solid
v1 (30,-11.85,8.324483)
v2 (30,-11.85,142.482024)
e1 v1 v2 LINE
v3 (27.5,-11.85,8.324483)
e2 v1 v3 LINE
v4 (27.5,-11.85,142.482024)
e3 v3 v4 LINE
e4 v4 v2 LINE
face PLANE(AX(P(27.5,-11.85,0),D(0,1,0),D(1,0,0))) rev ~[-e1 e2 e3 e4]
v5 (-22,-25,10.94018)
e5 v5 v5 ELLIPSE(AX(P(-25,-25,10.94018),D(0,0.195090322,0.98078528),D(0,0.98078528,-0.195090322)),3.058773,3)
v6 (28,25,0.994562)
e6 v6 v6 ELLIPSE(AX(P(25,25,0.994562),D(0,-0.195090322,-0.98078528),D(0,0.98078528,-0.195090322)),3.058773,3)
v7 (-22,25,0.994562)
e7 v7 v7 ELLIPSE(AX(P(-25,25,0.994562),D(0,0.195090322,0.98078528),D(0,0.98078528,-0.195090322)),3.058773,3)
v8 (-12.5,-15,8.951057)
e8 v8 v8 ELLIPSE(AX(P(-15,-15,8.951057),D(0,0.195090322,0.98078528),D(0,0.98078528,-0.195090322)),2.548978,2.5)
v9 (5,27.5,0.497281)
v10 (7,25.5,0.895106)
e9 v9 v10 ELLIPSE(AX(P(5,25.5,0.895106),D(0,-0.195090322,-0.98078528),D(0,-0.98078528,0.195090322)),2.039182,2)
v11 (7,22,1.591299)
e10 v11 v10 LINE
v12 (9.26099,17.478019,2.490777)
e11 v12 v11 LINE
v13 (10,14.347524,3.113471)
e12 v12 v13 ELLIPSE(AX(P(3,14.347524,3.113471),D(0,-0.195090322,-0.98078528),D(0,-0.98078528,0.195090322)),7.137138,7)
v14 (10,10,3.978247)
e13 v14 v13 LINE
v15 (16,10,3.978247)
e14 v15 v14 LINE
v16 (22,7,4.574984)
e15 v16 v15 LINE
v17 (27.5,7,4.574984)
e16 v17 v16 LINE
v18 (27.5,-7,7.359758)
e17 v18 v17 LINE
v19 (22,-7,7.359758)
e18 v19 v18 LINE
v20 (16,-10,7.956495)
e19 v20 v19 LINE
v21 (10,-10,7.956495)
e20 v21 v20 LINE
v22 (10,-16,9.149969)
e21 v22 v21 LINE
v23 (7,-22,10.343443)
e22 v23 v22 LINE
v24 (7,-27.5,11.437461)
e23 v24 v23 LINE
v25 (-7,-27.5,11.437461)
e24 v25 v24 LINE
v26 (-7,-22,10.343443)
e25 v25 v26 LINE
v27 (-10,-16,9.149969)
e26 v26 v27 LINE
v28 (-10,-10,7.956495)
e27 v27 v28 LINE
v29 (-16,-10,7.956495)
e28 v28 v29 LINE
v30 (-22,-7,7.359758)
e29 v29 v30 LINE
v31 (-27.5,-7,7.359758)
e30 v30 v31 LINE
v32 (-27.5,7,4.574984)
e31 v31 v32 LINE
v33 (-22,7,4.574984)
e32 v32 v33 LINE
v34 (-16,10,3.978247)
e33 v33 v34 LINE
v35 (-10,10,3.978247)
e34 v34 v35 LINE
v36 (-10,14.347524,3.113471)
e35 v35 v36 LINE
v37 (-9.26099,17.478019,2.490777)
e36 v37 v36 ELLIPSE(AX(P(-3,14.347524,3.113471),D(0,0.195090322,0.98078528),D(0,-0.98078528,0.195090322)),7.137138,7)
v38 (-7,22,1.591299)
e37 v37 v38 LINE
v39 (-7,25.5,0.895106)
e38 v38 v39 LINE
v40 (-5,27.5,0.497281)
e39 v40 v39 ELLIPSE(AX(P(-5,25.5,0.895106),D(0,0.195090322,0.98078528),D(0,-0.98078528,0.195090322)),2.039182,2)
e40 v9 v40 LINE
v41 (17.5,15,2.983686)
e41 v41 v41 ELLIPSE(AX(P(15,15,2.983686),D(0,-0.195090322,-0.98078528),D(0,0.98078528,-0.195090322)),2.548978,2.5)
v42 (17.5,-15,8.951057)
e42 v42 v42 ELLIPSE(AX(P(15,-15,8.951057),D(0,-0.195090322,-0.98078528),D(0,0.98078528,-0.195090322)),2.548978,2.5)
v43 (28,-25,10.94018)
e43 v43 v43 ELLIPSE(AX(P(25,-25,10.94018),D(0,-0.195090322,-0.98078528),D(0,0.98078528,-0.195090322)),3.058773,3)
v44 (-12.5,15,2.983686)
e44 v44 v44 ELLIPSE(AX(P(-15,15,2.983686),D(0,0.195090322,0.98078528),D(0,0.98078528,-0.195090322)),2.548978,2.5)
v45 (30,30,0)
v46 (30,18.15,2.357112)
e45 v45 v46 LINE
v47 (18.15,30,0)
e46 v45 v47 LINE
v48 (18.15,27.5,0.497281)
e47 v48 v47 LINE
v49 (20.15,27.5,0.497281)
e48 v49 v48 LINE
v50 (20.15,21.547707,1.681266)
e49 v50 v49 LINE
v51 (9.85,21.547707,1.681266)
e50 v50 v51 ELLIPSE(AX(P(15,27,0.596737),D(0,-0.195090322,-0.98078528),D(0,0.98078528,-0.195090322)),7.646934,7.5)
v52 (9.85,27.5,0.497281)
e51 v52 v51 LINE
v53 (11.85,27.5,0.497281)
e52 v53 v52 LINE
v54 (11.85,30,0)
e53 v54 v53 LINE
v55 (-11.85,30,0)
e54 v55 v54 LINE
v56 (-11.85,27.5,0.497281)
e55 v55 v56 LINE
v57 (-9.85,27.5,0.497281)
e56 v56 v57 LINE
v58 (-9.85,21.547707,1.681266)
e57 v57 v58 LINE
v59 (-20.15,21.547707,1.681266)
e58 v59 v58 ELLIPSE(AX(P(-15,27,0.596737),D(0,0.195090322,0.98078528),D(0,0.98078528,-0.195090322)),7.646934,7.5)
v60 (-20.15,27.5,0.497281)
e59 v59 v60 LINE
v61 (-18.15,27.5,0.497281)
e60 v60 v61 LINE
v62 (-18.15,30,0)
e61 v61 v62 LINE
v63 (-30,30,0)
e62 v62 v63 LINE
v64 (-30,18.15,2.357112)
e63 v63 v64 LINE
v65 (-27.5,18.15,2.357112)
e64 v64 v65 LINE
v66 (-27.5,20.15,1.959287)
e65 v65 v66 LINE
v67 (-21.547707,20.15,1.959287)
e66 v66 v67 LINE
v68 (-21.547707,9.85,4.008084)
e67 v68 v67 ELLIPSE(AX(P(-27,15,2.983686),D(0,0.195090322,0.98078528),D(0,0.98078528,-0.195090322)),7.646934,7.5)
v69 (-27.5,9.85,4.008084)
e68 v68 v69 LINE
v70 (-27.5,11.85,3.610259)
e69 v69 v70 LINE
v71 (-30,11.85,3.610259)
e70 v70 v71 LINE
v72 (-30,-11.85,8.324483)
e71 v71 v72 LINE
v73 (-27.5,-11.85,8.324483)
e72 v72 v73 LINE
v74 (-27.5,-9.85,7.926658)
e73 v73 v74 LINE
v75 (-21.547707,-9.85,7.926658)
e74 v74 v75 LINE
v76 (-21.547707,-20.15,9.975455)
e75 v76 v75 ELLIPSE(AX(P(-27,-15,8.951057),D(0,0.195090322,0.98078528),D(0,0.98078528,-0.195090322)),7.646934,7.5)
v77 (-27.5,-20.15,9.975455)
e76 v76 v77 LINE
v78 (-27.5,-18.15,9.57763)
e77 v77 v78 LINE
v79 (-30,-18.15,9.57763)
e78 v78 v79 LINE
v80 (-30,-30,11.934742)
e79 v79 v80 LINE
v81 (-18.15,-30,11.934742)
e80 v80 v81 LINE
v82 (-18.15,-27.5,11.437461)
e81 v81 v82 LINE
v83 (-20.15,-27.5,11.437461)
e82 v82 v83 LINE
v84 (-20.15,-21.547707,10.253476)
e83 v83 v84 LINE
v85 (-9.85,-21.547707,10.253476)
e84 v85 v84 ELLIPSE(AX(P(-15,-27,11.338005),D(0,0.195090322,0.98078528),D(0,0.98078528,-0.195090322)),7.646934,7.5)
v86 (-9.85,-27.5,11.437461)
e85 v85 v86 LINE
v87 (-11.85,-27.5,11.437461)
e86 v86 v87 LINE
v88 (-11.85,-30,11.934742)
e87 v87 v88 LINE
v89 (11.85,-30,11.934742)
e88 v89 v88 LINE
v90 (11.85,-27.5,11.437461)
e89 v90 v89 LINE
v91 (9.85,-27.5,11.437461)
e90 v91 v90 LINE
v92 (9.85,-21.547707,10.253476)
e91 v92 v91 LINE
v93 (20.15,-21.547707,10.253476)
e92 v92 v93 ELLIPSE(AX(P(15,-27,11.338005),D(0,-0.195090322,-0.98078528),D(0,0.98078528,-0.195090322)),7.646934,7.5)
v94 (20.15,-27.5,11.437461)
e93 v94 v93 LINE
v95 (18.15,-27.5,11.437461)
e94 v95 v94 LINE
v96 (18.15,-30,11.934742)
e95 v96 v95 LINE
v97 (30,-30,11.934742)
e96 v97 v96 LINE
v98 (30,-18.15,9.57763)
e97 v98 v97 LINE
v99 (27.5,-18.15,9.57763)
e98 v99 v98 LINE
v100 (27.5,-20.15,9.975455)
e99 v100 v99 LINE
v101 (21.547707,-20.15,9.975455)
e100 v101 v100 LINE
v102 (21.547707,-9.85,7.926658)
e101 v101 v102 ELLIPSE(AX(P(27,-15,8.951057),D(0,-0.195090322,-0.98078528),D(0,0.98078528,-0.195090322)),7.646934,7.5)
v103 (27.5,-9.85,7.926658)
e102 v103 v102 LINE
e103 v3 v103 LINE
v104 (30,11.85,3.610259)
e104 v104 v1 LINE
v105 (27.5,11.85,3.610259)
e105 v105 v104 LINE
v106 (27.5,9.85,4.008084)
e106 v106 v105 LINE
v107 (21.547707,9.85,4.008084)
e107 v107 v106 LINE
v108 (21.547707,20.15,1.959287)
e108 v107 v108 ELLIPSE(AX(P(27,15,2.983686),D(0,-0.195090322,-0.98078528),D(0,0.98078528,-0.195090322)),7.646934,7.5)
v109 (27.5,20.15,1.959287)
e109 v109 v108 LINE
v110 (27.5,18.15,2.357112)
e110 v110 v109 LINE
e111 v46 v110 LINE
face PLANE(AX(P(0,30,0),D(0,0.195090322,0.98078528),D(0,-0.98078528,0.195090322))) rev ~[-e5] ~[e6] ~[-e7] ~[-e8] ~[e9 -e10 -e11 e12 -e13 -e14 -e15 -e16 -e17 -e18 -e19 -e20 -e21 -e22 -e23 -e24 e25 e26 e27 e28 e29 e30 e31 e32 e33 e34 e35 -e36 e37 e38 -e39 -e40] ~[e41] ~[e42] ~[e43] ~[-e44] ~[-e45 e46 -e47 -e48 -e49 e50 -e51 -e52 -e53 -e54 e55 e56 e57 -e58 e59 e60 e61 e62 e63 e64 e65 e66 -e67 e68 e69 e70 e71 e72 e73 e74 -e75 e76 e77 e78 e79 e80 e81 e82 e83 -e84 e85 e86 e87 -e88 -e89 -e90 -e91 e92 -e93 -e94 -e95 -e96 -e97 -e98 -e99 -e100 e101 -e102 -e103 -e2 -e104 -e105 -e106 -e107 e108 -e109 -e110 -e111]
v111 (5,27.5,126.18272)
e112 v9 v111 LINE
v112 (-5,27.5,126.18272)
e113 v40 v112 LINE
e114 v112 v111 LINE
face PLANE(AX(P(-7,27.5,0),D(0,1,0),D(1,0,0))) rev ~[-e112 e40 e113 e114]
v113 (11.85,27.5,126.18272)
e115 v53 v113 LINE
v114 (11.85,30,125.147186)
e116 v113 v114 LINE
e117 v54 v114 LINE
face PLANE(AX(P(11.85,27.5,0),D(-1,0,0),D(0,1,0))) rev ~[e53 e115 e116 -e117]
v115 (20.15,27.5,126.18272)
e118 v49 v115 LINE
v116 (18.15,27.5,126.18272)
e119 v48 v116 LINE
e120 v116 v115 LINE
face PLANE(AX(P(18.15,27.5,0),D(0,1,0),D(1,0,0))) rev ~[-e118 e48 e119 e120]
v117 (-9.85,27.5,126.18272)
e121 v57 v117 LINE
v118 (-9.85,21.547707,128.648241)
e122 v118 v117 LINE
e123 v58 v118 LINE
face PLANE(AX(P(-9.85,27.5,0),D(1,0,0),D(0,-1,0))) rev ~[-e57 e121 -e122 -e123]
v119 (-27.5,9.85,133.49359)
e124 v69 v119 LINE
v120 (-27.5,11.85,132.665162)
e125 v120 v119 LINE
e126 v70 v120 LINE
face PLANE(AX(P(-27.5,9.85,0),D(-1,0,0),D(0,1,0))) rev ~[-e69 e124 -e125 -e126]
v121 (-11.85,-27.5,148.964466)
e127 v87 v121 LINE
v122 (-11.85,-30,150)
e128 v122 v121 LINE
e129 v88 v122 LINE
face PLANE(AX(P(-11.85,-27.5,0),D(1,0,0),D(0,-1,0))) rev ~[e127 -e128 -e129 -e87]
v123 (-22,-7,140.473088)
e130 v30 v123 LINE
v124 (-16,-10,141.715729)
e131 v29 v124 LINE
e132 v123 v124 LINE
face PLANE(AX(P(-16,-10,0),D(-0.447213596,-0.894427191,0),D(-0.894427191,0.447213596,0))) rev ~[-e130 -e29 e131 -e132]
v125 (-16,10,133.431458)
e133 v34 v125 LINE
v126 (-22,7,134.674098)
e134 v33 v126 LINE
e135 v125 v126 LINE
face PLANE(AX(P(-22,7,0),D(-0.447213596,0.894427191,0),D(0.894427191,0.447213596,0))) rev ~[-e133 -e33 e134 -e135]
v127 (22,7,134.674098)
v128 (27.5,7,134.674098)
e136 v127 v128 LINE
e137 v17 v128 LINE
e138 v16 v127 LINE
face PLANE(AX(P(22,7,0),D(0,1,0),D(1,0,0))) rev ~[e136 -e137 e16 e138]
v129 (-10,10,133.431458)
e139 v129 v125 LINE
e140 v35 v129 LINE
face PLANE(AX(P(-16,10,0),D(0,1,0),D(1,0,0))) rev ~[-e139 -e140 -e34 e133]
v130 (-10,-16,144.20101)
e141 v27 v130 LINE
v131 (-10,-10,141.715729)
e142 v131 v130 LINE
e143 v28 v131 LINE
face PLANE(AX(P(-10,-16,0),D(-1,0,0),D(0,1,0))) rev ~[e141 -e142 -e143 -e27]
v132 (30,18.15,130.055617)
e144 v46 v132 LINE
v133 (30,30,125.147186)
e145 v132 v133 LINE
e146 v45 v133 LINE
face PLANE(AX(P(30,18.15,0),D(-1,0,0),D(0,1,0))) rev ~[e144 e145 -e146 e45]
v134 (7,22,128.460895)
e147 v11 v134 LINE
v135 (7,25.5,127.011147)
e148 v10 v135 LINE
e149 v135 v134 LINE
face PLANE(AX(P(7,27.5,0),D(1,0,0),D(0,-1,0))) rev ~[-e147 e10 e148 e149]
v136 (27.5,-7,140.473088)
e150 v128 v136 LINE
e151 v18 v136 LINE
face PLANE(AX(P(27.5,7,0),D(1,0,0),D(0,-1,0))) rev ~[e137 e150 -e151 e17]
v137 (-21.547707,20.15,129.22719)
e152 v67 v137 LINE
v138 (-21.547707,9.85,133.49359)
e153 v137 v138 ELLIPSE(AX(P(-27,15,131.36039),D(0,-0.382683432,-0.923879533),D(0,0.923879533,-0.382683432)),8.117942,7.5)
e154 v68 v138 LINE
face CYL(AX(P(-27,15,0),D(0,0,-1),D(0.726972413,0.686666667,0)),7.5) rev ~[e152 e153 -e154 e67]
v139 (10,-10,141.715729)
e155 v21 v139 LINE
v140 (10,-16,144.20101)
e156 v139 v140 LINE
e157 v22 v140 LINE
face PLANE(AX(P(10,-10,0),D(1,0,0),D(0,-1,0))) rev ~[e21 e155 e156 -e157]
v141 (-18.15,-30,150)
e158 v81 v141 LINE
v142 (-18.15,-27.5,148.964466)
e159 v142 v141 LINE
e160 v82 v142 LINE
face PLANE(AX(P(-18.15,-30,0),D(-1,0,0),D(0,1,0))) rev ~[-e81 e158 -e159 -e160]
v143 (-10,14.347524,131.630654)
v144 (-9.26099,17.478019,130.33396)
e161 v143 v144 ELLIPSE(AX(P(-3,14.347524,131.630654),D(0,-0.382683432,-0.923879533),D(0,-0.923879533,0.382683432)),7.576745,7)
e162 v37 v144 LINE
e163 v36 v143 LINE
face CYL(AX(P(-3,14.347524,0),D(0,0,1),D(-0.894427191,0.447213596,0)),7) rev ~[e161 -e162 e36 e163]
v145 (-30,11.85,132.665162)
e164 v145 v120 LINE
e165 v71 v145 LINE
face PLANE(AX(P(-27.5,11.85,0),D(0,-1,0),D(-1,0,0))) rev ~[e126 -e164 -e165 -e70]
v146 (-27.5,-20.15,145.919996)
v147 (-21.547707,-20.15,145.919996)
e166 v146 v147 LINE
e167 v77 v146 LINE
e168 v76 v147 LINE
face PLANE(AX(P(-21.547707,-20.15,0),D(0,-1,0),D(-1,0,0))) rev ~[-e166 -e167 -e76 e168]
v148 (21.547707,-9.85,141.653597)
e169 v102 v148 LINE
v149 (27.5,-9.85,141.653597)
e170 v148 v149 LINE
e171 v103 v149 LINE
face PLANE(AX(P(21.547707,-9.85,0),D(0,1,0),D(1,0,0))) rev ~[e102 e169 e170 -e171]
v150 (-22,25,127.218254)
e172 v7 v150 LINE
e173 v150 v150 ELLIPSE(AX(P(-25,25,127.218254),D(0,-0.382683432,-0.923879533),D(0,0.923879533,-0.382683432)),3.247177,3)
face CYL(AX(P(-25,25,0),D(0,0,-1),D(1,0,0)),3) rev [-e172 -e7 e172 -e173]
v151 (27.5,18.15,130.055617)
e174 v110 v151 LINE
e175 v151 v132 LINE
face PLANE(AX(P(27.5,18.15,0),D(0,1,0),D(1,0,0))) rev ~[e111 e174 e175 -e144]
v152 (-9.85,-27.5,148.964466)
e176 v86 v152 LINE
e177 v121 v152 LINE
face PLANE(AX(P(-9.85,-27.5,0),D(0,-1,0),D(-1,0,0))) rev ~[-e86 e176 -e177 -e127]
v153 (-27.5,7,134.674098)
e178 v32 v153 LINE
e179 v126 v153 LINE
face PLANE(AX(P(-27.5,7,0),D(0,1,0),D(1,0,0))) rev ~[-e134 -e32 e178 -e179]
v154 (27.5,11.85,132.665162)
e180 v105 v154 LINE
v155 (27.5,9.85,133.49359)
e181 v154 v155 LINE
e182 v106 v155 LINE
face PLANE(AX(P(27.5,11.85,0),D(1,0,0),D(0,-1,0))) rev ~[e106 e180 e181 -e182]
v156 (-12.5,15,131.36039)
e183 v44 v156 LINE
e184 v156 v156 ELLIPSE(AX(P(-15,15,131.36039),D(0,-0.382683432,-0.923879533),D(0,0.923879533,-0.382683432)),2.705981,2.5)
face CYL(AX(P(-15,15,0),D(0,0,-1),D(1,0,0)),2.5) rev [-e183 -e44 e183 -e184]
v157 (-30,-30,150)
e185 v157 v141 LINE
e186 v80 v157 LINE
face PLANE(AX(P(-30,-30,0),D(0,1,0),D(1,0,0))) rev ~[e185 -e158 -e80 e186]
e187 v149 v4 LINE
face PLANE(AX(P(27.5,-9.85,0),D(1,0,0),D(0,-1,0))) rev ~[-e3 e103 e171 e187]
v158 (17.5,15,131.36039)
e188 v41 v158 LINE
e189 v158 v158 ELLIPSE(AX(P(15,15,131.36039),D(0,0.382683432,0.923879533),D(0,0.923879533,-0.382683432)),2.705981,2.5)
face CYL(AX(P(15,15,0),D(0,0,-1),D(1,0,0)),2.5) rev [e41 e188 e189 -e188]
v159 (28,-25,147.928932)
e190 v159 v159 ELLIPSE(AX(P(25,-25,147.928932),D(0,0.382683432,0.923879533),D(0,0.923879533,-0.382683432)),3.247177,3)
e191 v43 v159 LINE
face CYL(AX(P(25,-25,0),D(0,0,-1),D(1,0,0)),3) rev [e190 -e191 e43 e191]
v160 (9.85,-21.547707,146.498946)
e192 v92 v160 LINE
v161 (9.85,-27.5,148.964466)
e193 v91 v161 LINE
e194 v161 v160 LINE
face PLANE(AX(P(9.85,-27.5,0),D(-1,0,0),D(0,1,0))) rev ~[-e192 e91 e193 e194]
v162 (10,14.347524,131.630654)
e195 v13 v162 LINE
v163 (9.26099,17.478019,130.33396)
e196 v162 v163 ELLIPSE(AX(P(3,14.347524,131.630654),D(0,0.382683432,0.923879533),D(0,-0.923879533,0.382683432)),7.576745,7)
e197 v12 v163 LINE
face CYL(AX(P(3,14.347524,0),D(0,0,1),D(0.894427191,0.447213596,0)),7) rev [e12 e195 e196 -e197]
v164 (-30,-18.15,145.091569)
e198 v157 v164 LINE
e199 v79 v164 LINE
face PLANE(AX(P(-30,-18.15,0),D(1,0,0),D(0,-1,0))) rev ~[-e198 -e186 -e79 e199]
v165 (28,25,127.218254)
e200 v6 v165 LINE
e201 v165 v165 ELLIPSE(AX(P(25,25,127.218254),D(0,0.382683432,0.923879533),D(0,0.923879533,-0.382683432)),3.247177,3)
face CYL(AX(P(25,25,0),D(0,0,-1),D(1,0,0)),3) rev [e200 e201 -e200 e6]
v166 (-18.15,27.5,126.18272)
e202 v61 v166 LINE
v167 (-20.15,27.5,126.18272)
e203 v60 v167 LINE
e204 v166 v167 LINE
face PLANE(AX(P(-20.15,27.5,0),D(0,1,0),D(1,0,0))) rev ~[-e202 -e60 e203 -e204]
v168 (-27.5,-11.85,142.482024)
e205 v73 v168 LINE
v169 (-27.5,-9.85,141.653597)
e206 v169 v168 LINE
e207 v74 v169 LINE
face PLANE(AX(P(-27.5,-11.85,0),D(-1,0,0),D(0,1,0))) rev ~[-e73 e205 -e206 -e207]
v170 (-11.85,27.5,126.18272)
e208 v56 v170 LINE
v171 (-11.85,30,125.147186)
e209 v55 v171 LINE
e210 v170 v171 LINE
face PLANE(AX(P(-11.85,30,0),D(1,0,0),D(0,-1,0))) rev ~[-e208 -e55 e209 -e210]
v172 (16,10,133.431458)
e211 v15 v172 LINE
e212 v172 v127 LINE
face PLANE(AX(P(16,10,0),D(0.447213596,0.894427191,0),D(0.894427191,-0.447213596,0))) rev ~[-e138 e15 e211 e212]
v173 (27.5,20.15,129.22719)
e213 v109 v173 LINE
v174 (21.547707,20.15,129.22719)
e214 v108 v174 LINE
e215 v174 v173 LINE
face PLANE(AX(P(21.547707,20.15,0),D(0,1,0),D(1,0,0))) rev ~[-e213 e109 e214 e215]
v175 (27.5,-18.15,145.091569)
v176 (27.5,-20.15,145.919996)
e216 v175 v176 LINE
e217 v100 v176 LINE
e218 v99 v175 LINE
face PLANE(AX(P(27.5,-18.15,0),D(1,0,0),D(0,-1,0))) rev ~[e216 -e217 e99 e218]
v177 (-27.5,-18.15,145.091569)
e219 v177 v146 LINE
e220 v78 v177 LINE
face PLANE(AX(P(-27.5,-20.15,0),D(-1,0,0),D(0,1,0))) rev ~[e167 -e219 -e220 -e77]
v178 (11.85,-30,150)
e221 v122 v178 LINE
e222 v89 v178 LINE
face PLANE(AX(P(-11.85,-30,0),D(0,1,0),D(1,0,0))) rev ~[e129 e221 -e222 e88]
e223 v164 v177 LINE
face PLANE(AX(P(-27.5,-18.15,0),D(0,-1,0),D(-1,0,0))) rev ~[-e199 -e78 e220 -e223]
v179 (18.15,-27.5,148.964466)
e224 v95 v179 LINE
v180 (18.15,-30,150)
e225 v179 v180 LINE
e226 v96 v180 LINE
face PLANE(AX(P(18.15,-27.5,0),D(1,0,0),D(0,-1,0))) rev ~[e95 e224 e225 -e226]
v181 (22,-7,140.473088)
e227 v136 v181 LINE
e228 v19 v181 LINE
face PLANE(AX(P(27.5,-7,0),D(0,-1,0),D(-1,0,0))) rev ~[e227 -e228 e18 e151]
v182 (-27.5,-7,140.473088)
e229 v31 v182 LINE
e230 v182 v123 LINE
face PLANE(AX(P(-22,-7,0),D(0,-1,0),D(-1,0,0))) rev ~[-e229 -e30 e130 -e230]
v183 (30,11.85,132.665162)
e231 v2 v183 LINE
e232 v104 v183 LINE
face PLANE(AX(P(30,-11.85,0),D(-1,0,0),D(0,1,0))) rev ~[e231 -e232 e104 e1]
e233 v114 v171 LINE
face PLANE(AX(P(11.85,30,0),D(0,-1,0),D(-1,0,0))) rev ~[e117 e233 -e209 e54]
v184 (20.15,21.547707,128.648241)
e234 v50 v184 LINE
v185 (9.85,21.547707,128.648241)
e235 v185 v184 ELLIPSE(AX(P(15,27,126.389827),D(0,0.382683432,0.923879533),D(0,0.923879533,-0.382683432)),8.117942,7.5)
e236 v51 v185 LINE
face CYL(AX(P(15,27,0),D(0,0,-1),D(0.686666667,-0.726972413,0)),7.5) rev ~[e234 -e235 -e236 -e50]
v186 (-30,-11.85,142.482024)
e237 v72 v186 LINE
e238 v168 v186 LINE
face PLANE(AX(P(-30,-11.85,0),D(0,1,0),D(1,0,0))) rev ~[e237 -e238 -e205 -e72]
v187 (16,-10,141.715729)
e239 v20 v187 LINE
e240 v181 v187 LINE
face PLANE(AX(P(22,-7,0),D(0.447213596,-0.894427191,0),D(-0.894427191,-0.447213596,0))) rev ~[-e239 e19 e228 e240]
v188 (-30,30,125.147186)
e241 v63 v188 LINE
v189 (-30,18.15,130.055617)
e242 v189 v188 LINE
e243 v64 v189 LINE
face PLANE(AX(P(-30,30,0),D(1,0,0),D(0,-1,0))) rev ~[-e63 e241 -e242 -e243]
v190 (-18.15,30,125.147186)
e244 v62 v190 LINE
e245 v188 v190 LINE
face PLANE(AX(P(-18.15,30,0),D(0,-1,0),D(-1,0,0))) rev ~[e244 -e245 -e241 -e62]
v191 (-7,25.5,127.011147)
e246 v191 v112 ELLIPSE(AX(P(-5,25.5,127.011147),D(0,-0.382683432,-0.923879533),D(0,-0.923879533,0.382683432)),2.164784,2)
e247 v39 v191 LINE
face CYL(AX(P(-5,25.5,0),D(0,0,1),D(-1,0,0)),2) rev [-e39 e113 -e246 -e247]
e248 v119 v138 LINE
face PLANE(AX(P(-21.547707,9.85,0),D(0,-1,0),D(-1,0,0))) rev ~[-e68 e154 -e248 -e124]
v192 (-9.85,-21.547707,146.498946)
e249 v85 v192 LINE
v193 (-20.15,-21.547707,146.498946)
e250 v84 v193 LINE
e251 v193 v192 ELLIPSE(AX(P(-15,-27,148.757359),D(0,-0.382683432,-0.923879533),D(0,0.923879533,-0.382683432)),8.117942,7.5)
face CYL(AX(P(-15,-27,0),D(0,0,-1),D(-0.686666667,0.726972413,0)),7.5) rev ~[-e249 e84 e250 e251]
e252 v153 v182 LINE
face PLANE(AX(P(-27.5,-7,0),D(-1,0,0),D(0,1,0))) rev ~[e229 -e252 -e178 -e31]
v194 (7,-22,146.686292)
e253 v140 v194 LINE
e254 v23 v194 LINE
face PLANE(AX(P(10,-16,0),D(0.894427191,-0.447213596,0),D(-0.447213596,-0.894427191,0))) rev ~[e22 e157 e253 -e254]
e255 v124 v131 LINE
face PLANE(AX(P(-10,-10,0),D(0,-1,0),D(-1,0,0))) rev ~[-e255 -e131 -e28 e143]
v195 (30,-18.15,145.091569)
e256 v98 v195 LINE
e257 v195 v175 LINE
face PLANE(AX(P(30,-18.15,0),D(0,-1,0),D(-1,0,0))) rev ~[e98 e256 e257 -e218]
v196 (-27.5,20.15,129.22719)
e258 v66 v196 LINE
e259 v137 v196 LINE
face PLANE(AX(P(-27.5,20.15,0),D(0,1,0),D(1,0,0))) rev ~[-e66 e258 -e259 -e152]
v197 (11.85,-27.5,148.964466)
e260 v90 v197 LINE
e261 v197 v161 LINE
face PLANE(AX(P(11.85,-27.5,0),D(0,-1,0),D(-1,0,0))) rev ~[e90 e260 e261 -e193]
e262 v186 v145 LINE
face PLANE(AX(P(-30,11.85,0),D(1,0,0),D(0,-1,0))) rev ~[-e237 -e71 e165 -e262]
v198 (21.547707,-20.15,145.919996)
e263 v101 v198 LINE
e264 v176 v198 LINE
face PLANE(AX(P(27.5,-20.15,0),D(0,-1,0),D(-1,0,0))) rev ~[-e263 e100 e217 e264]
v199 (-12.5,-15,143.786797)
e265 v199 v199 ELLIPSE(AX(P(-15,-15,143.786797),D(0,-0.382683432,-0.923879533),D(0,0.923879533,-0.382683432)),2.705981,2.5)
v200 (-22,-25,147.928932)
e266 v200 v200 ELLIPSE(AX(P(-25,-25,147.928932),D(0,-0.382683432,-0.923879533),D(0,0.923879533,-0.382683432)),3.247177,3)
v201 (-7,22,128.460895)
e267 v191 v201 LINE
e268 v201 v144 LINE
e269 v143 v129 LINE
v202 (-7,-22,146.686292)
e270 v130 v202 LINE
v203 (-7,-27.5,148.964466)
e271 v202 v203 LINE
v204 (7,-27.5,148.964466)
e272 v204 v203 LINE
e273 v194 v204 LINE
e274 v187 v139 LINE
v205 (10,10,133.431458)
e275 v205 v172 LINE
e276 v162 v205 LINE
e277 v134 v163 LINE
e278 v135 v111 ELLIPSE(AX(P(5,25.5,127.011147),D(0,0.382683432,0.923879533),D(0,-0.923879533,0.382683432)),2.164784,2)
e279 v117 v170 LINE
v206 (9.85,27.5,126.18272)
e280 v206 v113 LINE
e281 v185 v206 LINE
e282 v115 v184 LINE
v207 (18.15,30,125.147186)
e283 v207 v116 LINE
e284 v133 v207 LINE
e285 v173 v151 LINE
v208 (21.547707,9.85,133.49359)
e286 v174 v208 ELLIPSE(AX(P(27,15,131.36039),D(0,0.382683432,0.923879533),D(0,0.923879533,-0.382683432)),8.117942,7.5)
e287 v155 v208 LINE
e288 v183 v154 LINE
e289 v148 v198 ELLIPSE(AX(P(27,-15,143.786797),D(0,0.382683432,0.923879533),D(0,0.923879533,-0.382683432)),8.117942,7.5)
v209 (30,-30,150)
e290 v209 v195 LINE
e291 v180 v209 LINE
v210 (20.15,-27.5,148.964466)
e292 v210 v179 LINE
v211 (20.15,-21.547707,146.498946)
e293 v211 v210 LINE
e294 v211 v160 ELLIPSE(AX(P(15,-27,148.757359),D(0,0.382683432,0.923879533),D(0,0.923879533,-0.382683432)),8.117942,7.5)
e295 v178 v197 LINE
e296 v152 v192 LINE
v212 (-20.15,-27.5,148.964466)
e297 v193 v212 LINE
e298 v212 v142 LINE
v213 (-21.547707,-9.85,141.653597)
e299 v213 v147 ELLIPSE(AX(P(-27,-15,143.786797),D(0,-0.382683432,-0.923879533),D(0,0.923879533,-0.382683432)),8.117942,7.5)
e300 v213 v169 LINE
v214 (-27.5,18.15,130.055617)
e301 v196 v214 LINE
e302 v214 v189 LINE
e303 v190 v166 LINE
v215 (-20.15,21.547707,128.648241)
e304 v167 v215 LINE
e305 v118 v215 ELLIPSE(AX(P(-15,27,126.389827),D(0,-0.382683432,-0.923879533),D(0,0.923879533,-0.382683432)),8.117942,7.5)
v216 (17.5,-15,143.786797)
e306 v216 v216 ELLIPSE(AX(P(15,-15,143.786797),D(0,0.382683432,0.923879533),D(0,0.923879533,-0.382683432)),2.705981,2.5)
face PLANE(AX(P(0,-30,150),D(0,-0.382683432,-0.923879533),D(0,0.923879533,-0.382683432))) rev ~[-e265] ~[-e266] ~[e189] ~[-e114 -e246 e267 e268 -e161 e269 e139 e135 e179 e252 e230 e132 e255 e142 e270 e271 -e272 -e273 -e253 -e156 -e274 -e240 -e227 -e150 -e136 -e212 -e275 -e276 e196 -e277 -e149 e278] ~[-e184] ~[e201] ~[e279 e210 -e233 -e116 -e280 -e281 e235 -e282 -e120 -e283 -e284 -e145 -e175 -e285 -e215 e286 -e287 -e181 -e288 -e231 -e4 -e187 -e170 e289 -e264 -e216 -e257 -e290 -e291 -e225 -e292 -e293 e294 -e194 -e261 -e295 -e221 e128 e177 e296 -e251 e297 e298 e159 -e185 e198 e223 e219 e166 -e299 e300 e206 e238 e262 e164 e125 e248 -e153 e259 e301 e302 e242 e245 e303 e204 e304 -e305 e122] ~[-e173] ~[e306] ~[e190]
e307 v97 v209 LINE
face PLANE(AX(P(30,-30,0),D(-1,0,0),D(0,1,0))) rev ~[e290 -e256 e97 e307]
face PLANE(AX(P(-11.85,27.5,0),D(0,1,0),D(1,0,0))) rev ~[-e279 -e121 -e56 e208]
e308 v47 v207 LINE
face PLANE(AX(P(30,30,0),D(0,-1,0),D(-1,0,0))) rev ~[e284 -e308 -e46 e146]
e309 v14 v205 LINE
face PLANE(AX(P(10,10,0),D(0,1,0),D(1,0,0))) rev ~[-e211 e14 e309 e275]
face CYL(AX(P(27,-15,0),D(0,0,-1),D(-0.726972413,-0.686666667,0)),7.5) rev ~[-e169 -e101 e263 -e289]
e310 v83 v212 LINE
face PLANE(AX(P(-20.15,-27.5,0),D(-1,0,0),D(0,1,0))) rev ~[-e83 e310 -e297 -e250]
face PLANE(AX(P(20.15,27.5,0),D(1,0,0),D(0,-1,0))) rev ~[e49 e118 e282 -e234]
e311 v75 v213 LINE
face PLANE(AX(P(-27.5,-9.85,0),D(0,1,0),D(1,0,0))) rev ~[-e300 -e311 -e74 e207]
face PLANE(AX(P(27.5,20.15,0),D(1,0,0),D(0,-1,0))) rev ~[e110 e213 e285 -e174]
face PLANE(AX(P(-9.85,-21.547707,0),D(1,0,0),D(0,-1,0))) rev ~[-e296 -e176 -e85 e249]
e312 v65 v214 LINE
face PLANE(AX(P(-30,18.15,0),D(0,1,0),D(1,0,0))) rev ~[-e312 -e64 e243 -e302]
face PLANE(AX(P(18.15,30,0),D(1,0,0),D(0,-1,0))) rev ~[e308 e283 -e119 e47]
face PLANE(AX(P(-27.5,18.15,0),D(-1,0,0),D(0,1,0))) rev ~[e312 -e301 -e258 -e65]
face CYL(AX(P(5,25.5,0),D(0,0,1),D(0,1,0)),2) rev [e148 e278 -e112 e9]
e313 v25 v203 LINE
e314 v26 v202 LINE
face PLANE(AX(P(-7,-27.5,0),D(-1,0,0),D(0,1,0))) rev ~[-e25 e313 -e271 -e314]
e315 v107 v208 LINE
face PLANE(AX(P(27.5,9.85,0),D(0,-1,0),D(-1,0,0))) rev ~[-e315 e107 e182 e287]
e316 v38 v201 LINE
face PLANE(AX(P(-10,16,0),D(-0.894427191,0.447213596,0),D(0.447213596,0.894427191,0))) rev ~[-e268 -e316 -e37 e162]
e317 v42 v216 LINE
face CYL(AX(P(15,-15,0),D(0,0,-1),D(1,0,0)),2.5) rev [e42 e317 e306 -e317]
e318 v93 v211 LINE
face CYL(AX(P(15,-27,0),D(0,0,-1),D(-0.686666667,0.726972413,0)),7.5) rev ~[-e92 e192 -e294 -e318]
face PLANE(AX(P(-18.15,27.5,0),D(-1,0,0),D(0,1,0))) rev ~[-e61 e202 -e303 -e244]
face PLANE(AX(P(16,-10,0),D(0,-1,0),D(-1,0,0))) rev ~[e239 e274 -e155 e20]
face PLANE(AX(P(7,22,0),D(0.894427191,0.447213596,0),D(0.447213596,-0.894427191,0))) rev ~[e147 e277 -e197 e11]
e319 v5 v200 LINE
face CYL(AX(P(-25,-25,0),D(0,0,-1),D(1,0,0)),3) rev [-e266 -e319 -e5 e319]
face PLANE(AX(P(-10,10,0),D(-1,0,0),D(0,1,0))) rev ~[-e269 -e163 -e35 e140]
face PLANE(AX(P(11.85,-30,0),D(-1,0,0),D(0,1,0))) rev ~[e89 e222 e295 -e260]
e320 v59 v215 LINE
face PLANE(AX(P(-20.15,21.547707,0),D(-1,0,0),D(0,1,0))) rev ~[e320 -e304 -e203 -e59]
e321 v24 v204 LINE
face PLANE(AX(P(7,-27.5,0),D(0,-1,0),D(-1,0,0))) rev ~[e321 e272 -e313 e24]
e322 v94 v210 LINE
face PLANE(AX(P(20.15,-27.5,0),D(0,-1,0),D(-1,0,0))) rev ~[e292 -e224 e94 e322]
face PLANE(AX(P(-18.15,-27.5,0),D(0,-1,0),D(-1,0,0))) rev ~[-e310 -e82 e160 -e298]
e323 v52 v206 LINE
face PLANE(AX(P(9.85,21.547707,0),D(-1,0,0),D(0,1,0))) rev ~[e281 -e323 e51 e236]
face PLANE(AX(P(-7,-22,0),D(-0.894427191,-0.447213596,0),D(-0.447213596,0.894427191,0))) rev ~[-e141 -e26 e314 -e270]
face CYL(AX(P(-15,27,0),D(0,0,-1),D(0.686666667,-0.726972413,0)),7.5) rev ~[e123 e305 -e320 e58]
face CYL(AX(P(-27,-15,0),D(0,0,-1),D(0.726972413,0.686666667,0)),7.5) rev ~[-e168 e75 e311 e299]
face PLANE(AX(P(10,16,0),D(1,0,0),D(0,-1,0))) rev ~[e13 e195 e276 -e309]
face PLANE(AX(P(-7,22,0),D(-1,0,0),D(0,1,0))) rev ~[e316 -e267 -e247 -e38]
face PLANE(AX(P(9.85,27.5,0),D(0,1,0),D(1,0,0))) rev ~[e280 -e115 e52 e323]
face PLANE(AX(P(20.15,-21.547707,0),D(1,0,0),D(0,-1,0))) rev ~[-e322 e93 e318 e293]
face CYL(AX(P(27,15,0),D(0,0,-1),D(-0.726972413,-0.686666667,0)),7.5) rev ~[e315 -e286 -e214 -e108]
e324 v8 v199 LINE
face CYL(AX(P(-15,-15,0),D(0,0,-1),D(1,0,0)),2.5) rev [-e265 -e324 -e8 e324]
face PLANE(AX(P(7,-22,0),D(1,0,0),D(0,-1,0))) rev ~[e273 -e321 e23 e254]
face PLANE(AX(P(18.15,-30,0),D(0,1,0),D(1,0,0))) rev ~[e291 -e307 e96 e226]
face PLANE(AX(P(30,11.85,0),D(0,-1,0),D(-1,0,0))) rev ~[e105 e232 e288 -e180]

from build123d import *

# Parameters (mm, degrees)
F0_R          = 3
F0_R_2        = 2.5
F1_DEPTH      = 150
F2_R          = 2
F3_R          = 7
F6_DEPTH      = 30
F6_DEPTH_BACK = 30


# Not quite as in the source:
# - a feature names something its author has since deleted; it is built from what else it names


with BuildPart() as f1:
    # F0 (on Top) → F1 (new body)
    with BuildSketch(Plane.XY):
        with BuildLine():
            Line((18.15, -30), (30, -30))
            Line((30, -30), (30, -18.15))
            Line((30, -18.15), (27.5, -18.15))
            Line((27.5, -18.15), (27.5, -20.15))
            Line((27.5, -20.15), (21.5477069044, -20.15))
            ThreePointArc((21.5477069044, -20.15), (19.5, -15), (21.5477069044, -9.85))
            Line((21.5477069044, -9.85), (27.5, -9.85))
            Line((27.5, -9.85), (27.5, -11.85))
            Line((27.5, -11.85), (30, -11.85))
            Line((30, -11.85), (30, 11.85))
            Line((30, 11.85), (27.5, 11.85))
            Line((27.5, 11.85), (27.5, 9.85))
            Line((27.5, 9.85), (21.5477069044, 9.85))
            ThreePointArc((21.5477069044, 9.85), (19.5, 15), (21.5477069044, 20.15))
            Line((21.5477069044, 20.15), (27.5, 20.15))
            Line((27.5, 20.15), (27.5, 18.15))
            Line((27.5, 18.15), (30, 18.15))
            Line((30, 18.15), (30, 30))
            Line((30, 30), (18.15, 30))
            Line((18.15, 30), (18.15, 27.5))
            Line((18.15, 27.5), (20.15, 27.5))
            Line((20.15, 27.5), (20.15, 21.5477069044))
            ThreePointArc((20.15, 21.5477069044), (15, 19.5), (9.85, 21.5477069044))
            Line((9.85, 21.5477069044), (9.85, 27.5))
            Line((9.85, 27.5), (11.85, 27.5))
            Line((11.85, 27.5), (11.85, 30))
            Line((11.85, 30), (-11.85, 30))
            Line((-11.85, 30), (-11.85, 27.5))
            Line((-11.85, 27.5), (-9.85, 27.5))
            Line((-9.85, 27.5), (-9.85, 21.5477069044))
            ThreePointArc((-9.85, 21.5477069044), (-15, 19.5), (-20.15, 21.5477069044))
            Line((-20.15, 21.5477069044), (-20.15, 27.5))
            Line((-20.15, 27.5), (-18.15, 27.5))
            Line((-18.15, 27.5), (-18.15, 30))
            Line((-18.15, 30), (-30, 30))
            Line((-30, 30), (-30, 18.15))
            Line((-30, 18.15), (-27.5, 18.15))
            Line((-27.5, 18.15), (-27.5, 20.15))
            Line((-27.5, 20.15), (-21.5477069044, 20.15))
            ThreePointArc((-21.5477069044, 20.15), (-19.5, 15), (-21.5477069044, 9.85))
            Line((-21.5477069044, 9.85), (-27.5, 9.85))
            Line((-27.5, 9.85), (-27.5, 11.85))
            Line((-27.5, 11.85), (-30, 11.85))
            Line((-30, 11.85), (-30, -11.85))
            Line((-30, -11.85), (-27.5, -11.85))
            Line((-27.5, -11.85), (-27.5, -9.85))
            Line((-27.5, -9.85), (-21.5477069044, -9.85))
            ThreePointArc((-21.5477069044, -9.85), (-19.5, -15), (-21.5477069044, -20.15))
            Line((-21.5477069044, -20.15), (-27.5, -20.15))
            Line((-27.5, -20.15), (-27.5, -18.15))
            Line((-27.5, -18.15), (-30, -18.15))
            Line((-30, -18.15), (-30, -30))
            Line((-30, -30), (-18.15, -30))
            Line((-18.15, -30), (-18.15, -27.5))
            Line((-18.15, -27.5), (-20.15, -27.5))
            Line((-20.15, -27.5), (-20.15, -21.5477069044))
            ThreePointArc((-20.15, -21.5477069044), (-15, -19.5), (-9.85, -21.5477069044))
            Line((-9.85, -21.5477069044), (-9.85, -27.5))
            Line((-9.85, -27.5), (-11.85, -27.5))
            Line((-11.85, -27.5), (-11.85, -30))
            Line((-11.85, -30), (11.85, -30))
            Line((11.85, -30), (11.85, -27.5))
            Line((11.85, -27.5), (9.85, -27.5))
            Line((9.85, -27.5), (9.85, -21.5477069044))
            ThreePointArc((9.85, -21.5477069044), (15, -19.5), (20.15, -21.5477069044))
            Line((20.15, -21.5477069044), (20.15, -27.5))
            Line((20.15, -27.5), (18.15, -27.5))
            Line((18.15, -27.5), (18.15, -30))
        make_face()
        with Locations((-25, -25)):
            Circle(F0_R, mode=Mode.SUBTRACT)
        with Locations((-15, -15)):
            Circle(F0_R_2, mode=Mode.SUBTRACT)
        with Locations((25, -25)):
            Circle(F0_R, mode=Mode.SUBTRACT)
        with Locations((15, -15)):
            Circle(F0_R_2, mode=Mode.SUBTRACT)
        with Locations((-25, 25)):
            Circle(F0_R, mode=Mode.SUBTRACT)
        with Locations((-15, 15)):
            Circle(F0_R_2, mode=Mode.SUBTRACT)
        Polygon((-7, 22), (-7, 27.5), (0, 27.5), (7, 27.5), (7, 22), (10, 16), (10, 10), (16, 10), (22, 7), (27.5, 7), (27.5, 0), (27.5, -7), (22, -7), (16, -10), (10, -10), (10, -16), (7, -22), (7, -27.5), (0, -27.5), (-7, -27.5), (-7, -22), (-10, -16), (-10, -10), (-16, -10), (-22, -7), (-27.5, -7), (-27.5, 0), (-27.5, 7), (-22, 7), (-16, 10), (-10, 10), (-10, 16), align=None, mode=Mode.SUBTRACT)
        with Locations((15, 15)):
            Circle(F0_R_2, mode=Mode.SUBTRACT)
        with Locations((25, 25)):
            Circle(F0_R, mode=Mode.SUBTRACT)
    extrude(amount=F1_DEPTH)

    # F2
    f2_edges = [f1.edges().sort_by_distance(p)[0] for p in [
        (-7, 27.5, 75),
        (7, 27.5, 75),
    ]]
    fillet(f2_edges, radius=F2_R)

    # F3
    f3_edges = [f1.edges().sort_by_distance(p)[0] for p in [
        (-10, 16, 75),
        (10, 16, 75),
    ]]
    fillet(f3_edges, radius=F3_R)

    # F5 (on Right) → F6 (cut, two sides)
    with BuildSketch(Plane.YZ) as f6_sk:
        Polygon((14.9420964297, -75.7011932878), (30, 0), (-77.5301070084, 21.3890681496), (-92.5880105787, -54.3121251382), align=None)
        Polygon((89.181769874, 100.6332945306), (123.8334032044, 184.2897376752), (4.6516333304, 233.6564431446), (-30, 150), align=None)
    extrude(amount=F6_DEPTH, mode=Mode.SUBTRACT)
    extrude(f6_sk.sketch, amount=-F6_DEPTH_BACK, mode=Mode.SUBTRACT)


solid = f1.part
